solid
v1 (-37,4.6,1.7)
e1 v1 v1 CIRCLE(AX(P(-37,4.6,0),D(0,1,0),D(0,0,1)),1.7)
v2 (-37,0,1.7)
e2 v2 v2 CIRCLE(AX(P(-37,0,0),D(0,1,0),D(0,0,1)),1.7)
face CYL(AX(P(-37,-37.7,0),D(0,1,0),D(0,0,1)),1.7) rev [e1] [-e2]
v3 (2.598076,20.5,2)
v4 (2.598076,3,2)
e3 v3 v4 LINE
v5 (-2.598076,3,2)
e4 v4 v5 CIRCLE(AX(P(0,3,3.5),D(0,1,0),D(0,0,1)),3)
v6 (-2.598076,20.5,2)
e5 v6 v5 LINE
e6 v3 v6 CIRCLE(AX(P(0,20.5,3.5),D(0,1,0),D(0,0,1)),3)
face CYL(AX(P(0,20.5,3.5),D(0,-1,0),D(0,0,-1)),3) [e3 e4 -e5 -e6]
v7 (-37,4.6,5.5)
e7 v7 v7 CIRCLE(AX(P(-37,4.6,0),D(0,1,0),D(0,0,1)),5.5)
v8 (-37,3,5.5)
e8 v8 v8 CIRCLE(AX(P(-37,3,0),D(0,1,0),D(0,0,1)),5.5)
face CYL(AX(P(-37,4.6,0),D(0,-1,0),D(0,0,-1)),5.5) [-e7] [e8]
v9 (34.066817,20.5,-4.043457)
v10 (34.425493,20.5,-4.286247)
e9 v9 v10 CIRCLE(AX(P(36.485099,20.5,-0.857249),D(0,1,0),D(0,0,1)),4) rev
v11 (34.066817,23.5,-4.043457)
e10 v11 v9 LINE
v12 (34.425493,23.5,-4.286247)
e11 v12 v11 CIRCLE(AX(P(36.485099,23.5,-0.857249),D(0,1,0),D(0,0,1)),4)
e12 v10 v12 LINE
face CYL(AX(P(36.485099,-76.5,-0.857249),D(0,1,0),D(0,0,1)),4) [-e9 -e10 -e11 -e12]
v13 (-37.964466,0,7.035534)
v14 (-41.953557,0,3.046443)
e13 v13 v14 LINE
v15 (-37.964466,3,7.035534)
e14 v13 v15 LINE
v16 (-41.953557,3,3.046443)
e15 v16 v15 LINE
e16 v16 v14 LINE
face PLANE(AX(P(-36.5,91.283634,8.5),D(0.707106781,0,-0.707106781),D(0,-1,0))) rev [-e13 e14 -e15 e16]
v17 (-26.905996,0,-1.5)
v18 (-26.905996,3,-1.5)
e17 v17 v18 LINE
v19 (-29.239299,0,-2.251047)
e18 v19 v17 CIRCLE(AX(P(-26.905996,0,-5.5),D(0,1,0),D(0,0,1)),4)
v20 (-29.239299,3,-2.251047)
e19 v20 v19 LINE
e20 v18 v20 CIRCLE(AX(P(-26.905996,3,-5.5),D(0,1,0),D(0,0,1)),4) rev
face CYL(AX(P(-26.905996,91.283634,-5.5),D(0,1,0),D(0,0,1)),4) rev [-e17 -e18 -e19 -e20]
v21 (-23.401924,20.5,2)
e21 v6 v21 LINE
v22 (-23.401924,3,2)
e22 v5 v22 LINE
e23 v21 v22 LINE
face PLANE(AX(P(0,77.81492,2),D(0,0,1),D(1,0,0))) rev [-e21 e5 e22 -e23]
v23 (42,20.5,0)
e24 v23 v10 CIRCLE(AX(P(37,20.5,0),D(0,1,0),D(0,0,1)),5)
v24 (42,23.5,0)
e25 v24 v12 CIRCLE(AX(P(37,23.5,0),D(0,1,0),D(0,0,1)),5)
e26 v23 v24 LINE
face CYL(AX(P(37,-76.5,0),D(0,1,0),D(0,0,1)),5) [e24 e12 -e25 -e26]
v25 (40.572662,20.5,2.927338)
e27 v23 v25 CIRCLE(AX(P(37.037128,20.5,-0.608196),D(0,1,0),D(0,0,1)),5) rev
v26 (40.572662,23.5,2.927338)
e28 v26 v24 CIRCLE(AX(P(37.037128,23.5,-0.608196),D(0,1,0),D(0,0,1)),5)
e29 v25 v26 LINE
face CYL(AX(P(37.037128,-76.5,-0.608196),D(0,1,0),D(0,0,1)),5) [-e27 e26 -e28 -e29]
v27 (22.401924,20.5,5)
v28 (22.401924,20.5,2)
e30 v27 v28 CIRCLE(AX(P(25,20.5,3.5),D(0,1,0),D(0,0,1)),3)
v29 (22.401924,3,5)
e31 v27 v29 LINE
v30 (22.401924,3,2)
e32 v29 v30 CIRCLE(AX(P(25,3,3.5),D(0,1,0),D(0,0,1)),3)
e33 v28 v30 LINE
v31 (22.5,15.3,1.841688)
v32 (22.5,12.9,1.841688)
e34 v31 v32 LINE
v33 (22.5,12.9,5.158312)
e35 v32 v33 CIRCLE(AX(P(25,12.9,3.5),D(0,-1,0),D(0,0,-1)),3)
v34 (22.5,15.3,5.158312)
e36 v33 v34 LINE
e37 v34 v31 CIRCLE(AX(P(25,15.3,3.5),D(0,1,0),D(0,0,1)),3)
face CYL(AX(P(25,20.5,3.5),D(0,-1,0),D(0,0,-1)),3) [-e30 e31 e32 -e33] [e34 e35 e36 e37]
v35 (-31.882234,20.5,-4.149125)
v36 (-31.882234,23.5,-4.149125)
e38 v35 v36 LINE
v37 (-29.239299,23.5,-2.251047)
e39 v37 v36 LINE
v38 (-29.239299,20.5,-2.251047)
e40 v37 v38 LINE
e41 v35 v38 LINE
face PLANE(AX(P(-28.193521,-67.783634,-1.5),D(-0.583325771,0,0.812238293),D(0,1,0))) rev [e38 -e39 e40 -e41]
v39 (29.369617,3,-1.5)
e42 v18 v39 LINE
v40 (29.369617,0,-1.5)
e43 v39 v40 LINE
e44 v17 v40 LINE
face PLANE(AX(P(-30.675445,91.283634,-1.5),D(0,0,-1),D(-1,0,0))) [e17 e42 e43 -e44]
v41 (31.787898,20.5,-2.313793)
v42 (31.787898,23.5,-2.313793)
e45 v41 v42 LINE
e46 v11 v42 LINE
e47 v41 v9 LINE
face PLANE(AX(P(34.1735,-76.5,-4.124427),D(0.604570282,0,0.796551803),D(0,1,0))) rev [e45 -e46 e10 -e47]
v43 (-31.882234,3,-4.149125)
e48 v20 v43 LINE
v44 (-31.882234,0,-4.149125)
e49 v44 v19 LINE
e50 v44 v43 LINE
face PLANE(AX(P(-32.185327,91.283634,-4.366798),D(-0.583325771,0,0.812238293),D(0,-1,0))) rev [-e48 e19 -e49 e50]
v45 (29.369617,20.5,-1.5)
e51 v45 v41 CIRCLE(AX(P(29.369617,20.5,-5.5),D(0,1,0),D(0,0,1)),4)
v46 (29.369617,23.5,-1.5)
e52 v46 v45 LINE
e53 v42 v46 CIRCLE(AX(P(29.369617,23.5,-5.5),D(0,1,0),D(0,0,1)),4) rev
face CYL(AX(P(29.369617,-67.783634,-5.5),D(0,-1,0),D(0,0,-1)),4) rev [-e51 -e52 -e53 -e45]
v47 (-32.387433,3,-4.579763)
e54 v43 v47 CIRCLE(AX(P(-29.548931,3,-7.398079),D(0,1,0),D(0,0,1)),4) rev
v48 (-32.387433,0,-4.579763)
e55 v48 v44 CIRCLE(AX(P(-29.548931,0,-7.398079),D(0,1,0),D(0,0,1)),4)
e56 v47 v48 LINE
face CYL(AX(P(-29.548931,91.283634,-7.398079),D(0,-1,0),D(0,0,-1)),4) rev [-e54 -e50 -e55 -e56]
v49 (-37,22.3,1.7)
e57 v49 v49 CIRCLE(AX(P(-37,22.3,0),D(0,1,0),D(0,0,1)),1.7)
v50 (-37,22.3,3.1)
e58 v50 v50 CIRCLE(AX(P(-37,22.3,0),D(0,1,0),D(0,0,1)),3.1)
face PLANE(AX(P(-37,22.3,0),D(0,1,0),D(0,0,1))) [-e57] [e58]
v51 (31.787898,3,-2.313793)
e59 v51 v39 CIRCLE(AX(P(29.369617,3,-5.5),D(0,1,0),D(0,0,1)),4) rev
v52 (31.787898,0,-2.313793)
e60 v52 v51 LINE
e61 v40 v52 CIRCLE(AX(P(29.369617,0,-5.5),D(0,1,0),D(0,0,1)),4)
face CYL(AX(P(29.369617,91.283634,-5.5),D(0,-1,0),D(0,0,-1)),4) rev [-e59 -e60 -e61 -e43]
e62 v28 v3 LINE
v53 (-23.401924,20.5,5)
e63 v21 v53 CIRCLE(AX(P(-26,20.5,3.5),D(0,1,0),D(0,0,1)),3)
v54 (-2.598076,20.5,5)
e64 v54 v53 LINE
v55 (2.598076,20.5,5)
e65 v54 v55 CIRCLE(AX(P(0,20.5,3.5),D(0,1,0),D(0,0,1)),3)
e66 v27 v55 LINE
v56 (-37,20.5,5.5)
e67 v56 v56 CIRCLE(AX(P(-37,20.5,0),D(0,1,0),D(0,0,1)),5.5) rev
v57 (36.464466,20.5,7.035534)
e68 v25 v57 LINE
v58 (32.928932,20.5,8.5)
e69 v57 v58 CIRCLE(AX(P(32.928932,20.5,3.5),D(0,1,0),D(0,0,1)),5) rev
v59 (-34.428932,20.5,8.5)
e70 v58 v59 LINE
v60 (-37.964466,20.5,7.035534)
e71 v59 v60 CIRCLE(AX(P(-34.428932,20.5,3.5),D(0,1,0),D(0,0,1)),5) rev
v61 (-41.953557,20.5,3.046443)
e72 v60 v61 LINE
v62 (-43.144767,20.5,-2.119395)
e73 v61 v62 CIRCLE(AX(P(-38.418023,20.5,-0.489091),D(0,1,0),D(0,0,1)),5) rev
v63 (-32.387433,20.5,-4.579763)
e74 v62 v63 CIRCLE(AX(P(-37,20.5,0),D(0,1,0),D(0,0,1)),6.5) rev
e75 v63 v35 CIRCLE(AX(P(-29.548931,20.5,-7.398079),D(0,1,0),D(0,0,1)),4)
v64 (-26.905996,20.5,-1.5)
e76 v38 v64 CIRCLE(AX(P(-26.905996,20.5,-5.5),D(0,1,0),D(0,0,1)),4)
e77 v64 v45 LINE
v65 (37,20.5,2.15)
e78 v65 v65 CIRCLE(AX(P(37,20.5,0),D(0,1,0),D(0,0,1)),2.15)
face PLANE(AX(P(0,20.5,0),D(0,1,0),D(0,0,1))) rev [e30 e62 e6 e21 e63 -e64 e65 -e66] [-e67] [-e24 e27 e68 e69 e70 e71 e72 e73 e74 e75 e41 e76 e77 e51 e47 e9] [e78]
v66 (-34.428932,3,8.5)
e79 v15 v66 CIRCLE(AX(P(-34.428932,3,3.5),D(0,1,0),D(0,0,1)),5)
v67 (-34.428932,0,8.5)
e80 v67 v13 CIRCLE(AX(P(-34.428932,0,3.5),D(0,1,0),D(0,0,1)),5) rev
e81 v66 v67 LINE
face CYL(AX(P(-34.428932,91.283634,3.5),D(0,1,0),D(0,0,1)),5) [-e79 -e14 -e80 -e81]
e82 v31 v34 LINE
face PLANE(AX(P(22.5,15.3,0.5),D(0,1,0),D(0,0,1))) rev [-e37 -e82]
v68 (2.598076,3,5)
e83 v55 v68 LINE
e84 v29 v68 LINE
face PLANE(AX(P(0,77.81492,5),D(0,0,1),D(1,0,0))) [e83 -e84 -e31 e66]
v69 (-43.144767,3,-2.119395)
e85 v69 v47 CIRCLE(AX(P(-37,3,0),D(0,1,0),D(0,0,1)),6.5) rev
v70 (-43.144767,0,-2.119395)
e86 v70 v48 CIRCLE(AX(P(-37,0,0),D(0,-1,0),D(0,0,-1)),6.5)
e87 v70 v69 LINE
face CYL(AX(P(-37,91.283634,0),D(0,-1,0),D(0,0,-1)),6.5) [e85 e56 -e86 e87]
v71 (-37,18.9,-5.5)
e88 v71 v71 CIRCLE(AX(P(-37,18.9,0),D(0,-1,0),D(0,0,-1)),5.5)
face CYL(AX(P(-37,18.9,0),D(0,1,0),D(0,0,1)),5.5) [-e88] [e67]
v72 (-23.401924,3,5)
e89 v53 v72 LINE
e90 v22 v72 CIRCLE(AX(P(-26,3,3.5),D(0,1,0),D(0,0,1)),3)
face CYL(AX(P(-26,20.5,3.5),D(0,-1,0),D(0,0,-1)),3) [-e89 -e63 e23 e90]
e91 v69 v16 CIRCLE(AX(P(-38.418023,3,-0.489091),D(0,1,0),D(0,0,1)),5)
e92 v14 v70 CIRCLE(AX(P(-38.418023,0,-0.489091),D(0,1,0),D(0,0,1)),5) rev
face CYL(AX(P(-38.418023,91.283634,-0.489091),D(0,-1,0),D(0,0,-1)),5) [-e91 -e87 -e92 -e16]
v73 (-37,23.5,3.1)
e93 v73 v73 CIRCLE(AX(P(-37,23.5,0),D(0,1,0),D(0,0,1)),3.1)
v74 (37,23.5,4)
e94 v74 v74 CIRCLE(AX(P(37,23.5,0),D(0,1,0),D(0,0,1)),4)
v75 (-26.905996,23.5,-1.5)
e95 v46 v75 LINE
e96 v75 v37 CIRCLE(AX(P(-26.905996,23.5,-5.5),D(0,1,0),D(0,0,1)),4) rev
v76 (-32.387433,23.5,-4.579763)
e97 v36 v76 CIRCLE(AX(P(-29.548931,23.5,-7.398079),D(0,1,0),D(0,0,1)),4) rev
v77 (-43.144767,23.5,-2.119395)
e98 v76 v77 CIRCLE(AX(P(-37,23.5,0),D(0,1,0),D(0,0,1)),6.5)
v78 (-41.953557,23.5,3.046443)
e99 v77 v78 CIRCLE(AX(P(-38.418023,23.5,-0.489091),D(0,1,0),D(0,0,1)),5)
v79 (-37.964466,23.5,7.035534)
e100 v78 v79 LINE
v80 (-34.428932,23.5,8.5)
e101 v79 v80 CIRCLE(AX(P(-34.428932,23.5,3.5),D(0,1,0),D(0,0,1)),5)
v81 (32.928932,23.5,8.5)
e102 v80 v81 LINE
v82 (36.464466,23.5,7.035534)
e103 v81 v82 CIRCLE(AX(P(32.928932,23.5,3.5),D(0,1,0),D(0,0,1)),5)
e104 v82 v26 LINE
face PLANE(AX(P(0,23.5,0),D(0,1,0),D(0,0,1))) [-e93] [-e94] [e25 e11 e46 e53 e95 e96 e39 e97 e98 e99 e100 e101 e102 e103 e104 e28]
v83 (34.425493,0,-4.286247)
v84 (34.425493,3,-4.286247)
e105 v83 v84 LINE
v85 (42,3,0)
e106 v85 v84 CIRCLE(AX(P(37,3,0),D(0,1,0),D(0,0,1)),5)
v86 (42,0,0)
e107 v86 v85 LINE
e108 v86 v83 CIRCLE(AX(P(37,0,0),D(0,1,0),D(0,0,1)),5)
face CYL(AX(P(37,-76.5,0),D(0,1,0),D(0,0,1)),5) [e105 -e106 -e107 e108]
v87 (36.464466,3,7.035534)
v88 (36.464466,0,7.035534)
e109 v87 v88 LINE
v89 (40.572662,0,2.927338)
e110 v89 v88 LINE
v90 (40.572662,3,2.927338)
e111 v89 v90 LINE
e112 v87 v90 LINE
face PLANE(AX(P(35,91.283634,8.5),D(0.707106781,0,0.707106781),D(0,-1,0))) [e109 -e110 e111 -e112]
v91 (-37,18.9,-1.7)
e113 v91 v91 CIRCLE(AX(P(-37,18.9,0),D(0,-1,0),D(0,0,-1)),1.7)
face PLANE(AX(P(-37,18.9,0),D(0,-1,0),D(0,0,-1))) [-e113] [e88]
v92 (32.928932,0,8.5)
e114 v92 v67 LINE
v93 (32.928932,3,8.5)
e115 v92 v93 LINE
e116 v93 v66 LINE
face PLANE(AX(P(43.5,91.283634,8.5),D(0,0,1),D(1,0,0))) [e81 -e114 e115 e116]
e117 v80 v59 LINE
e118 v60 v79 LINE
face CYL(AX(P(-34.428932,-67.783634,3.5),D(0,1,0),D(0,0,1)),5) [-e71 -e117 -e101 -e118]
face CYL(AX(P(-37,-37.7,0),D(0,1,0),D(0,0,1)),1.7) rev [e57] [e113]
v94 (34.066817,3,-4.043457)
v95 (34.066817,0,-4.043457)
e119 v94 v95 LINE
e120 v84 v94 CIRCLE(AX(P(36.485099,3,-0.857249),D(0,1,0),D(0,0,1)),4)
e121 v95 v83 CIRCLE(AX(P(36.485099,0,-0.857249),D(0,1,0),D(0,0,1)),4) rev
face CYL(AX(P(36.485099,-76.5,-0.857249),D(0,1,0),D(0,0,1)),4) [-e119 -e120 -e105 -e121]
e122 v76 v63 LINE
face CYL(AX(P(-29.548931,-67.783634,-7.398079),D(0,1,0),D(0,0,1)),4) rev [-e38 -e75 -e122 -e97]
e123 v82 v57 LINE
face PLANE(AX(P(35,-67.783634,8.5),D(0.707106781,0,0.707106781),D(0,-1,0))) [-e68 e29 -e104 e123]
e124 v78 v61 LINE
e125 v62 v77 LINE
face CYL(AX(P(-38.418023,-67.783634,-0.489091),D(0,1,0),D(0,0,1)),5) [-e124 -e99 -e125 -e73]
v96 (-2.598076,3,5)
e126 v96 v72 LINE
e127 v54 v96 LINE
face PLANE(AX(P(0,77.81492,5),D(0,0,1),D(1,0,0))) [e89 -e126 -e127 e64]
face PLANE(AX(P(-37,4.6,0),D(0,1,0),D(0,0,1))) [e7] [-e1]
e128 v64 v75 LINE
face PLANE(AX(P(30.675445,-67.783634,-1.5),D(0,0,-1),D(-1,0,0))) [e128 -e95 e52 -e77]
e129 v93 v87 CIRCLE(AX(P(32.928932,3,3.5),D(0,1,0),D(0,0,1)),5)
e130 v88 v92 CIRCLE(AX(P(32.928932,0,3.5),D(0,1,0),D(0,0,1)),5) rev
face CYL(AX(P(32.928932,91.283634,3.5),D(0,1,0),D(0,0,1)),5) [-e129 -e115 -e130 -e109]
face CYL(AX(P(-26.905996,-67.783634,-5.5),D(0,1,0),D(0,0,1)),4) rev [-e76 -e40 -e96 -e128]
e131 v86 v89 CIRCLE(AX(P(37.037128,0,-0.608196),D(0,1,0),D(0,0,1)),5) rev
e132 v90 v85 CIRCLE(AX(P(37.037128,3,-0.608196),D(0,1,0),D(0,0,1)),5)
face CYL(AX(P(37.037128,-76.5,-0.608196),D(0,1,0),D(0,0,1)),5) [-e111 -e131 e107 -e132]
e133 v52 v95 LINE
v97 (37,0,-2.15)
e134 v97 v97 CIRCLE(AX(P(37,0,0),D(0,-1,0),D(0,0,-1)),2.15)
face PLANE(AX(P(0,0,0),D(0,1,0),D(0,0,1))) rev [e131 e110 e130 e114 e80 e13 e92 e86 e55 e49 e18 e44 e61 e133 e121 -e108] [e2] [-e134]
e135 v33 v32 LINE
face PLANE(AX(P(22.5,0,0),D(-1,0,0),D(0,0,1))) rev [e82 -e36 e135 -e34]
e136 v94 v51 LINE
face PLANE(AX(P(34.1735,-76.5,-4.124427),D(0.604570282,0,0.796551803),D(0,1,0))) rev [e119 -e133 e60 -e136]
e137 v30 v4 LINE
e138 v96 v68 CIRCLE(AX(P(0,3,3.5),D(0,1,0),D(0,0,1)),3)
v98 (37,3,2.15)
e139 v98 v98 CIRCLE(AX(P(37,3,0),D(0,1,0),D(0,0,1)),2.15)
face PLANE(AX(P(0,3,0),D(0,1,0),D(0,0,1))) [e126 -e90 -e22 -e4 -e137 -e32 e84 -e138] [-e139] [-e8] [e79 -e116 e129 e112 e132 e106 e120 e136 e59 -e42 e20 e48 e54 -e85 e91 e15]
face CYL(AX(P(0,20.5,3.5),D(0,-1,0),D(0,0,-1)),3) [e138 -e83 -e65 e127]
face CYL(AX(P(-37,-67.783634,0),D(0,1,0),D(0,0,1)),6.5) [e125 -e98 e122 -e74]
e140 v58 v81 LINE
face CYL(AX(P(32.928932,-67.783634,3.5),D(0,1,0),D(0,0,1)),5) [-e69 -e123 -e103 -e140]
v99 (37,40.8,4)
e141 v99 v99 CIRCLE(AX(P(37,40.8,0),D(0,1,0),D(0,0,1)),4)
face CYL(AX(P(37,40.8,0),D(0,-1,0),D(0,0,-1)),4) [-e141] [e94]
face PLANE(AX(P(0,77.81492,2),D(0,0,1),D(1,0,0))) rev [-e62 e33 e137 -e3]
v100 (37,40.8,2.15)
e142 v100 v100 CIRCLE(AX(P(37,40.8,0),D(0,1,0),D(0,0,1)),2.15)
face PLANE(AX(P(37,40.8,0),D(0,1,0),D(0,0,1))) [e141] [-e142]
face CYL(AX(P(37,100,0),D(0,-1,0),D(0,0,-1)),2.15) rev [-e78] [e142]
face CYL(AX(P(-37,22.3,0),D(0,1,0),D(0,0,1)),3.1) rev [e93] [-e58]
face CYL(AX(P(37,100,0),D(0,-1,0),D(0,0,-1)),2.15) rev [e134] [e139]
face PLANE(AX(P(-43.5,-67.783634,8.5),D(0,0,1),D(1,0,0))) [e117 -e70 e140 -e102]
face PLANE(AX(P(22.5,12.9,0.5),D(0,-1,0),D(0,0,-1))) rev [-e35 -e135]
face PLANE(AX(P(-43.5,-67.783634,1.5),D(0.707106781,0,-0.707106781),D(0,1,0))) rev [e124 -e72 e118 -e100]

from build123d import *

# Parameters (mm, degrees)
SKETCH_1_R          = 4.5
SKETCH_1_R_2        = 1.6
EXTRUDE_3_DEPTH     = 3
SKETCH_2_R          = 3
EXTRUDE_4_DEPTH     = 17.5
SKETCH_3_R          = 3
SKETCH_3_R_2        = 1.6
EXTRUDE_5_DEPTH     = 3
SKETCH_4_R          = 1.6
SKETCH_4_R_2        = 2.15
CUT_EXTRUDE_1_DEPTH = 100
SKETCH_6_R          = 4
SKETCH_6_R_2        = 2.15
EXTRUDE_6_DEPTH     = 17.3
SKETCH_7_R          = 2.15
SKETCH_7_R_2        = 1.6
EXTRUDE_7_DEPTH     = 3
EXTRUDE_START       = -3
SKETCH_8_R          = 1.6
EXTRUDE_8_DEPTH     = 3
EXTRUDE_10_DEPTH    = 17.5
CUT_EXTRUDE_START   = -100
CUT_EXTRUDE_2_DEPTH = 100
SKETCH_13_R         = 2.15
CUT_EXTRUDE_3_DEPTH = 23.5
CHAMFER_1_SIZE      = 7
FILLET_1_R          = 5
SKETCH_14_W         = 6
SKETCH_14_H         = 2.4
CUT_EXTRUDE_4_DEPTH = 7.5
SKETCH_16_R         = 5.5
EXTRUDE_11_DEPTH    = 1.6
EXTRUDE_START_2     = 1.6
SKETCH_17_R         = 5.5
EXTRUDE_12_DEPTH    = 1.6
CUT_EXTRUDE_START_2 = -50
SKETCH_18_R         = 1.6
CUT_EXTRUDE_5_DEPTH = 50
SKETCH_20_R         = 3.1
CUT_EXTRUDE_7_DEPTH = 1.2
SKETCH_21_R         = 1.7
CUT_EXTRUDE_8_DEPTH = 60
CHAMFER_START       = -1
CHAMFER_2_DEPTH     = 25
CHAMFER_2_2_DEPTH   = 3
CHAMFER_START_2     = 20.5
CHAMFER_2_3_DEPTH   = 3
FILLET_2_R          = 4


with BuildPart() as part:
    # 草图1 → 凸台-拉伸3 (new body)
    # profile 1 of 3: a face of its own
    with BuildSketch(Plane(origin=(0, 0, 0), x_dir=(1, 0, 0), z_dir=(0, 1, 0))):
        with BuildLine():
            Line((-41.5, -6.5), (41.5, -6.5))
            Line((41.5, -6.5), (41.5, 0))
            ThreePointArc((41.5, 0), (37.250387902, -4.493028589), (32.527864045, -0.5))
            Line((32.527864045, -0.5), (-32.527864045, -0.5))
            ThreePointArc((-32.527864045, -0.5), (-37.250387902, -4.493028589), (-41.5, 0))
            Line((-41.5, 0), (-41.5, -6.5))
        make_face()
    # profile 2 of 3: a face of its own
    with BuildSketch(Plane(origin=(0, 0, 0), x_dir=(1, 0, 0), z_dir=(0, 1, 0))):
        with Locations((-37, 0)):
            Circle(SKETCH_1_R)
        with Locations(Location((-37, 0, 0), (0, 0, 270))):
            Circle(SKETCH_1_R_2, mode=Mode.SUBTRACT)
    # profile 3 of 3: a face of its own
    with BuildSketch(Plane(origin=(0, 0, 0), x_dir=(1, 0, 0), z_dir=(0, 1, 0))):
        with Locations((37, 0)):
            Circle(SKETCH_1_R)
        with Locations(Location((37, 0, 0), (0, 0, 270))):
            Circle(SKETCH_1_R_2, mode=Mode.SUBTRACT)
    extrude(amount=EXTRUDE_3_DEPTH)

    # 草图2 → 凸台-拉伸4 (add)
    with BuildSketch(Plane(origin=(0, 3, 0), x_dir=(1, 0, 0), z_dir=(0, 1, 0))):
        with Locations(Location((-26, -3.5, 0), (0, 0, 270))):
            Circle(SKETCH_2_R)
        with Locations(Location((25, -3.5, 0), (0, 0, 270))):
            Circle(SKETCH_2_R)
        with Locations(Location((0, -3.5, 0), (0, 0, 270))):
            Circle(SKETCH_2_R)
    extrude(amount=EXTRUDE_4_DEPTH)

    # 草图3 → 凸台-拉伸5 (add)
    # profile 1 of 7: a face of its own
    with BuildSketch(Plane(origin=(0, 20.5, 0), x_dir=(1, 0, 0), z_dir=(0, 1, 0))):
        with Locations(Location((-26, -3.5, 0), (0, 0, 90))):
            Circle(SKETCH_3_R)
    # profile 2 of 7: a face of its own
    with BuildSketch(Plane(origin=(0, 20.5, 0), x_dir=(1, 0, 0), z_dir=(0, 1, 0))):
        with BuildLine():
            ThreePointArc((0, -6.5), (-3, -3.5), (0, -0.5))
            Line((0, -0.5), (-26, -0.5))
            ThreePointArc((-26, -0.5), (-23.878679656, -1.378679656), (-23, -3.5))
            ThreePointArc((-23, -3.5), (-23.878679656, -5.621320344), (-26, -6.5))
            Line((-26, -6.5), (0, -6.5))
        make_face()
    # profile 3 of 7: a face of its own
    with BuildSketch(Plane(origin=(0, 20.5, 0), x_dir=(1, 0, 0), z_dir=(0, 1, 0))):
        with BuildLine():
            ThreePointArc((3, -3.5), (2.121320344, -1.378679656), (0, -0.5))
            ThreePointArc((0, -0.5), (-3, -3.5), (0, -6.5))
            ThreePointArc((0, -6.5), (2.121320344, -5.621320344), (3, -3.5))
        make_face()
    # profile 4 of 7: a face of its own
    with BuildSketch(Plane(origin=(0, 20.5, 0), x_dir=(1, 0, 0), z_dir=(0, 1, 0))):
        with BuildLine():
            ThreePointArc((25, -6.5), (22, -3.5), (25, -0.5))
            Line((25, -0.5), (0, -0.5))
            ThreePointArc((0, -0.5), (2.121320344, -1.378679656), (3, -3.5))
            ThreePointArc((3, -3.5), (2.121320344, -5.621320344), (0, -6.5))
            Line((0, -6.5), (25, -6.5))
        make_face()
    # profile 5 of 7: a face of its own
    with BuildSketch(Plane(origin=(0, 20.5, 0), x_dir=(1, 0, 0), z_dir=(0, 1, 0))):
        with BuildLine():
            ThreePointArc((28, -3.5), (27.121320344, -1.378679656), (25, -0.5))
            ThreePointArc((25, -0.5), (22, -3.5), (25, -6.5))
            ThreePointArc((25, -6.5), (27.121320344, -5.621320344), (28, -3.5))
        make_face()
    # profile 6 of 7: a face of its own
    with BuildSketch(Plane(origin=(0, 20.5, 0), x_dir=(1, 0, 0), z_dir=(0, 1, 0))):
        with BuildLine():
            Line((41.5, -6.5), (41.5, 0))
            ThreePointArc((41.5, 0), (36.749612098, 4.493028589), (32.527864045, -0.5))
            Line((32.527864045, -0.5), (25, -0.5))
            ThreePointArc((25, -0.5), (28, -3.5), (25, -6.5))
            Line((25, -6.5), (41.5, -6.5))
        make_face()
        with Locations(Location((37, 0, 0), (0, 0, 270))):
            Circle(SKETCH_3_R_2, mode=Mode.SUBTRACT)
    # profile 7 of 7: a face of its own
    with BuildSketch(Plane(origin=(0, 20.5, 0), x_dir=(1, 0, 0), z_dir=(0, 1, 0))):
        with BuildLine():
            ThreePointArc((-26, -0.5), (-29, -3.5), (-26, -6.5))
            Line((-26, -6.5), (-41.5, -6.5))
            Line((-41.5, -6.5), (-41.5, 0))
            ThreePointArc((-41.5, 0), (-36.749612098, 4.493028589), (-32.527864045, -0.5))
            Line((-32.527864045, -0.5), (-26, -0.5))
        make_face()
    extrude(amount=EXTRUDE_5_DEPTH)

    # 草图4 → 切除-拉伸1 (cut)
    with BuildSketch(Plane.XZ):
        with Locations(Location((-37, 0, 0), (0, 0, 90))):
            Circle(SKETCH_4_R)
        with Locations(Location((37, 0, 0), (0, 0, 90))):
            Circle(SKETCH_4_R_2)
    extrude(amount=-CUT_EXTRUDE_1_DEPTH, mode=Mode.SUBTRACT)

    # 草图6 → 凸台-拉伸6 (add)
    with BuildSketch(Plane(origin=(0, 23.5, 0), x_dir=(1, 0, 0), z_dir=(0, 1, 0))):
        with Locations(Location((37, 0, 0), (0, 0, 270))):
            Circle(SKETCH_6_R)
        with Locations(Location((37, 0, 0), (0, 0, 270))):
            Circle(SKETCH_6_R_2, mode=Mode.SUBTRACT)
    extrude(amount=EXTRUDE_6_DEPTH)

    # 草图7 → 凸台-拉伸7 (add)
    with BuildSketch(Plane.XZ):
        with BuildLine():
            Line((43.5, 0), (43.5, 8.5))
            Line((43.5, 8.5), (-43.5, 8.5))
            Line((-43.5, 8.5), (-43.5, 0))
            ThreePointArc((-43.5, 0), (-37.755112713, -6.455989838), (-30.67544468, -1.5))
            Line((-30.67544468, -1.5), (30.67544468, -1.5))
            ThreePointArc((30.67544468, -1.5), (37.755112713, -6.455989838), (43.5, 0))
        make_face()
        with Locations(Location((37, 0, 0), (0, 0, 90))):
            Circle(SKETCH_7_R, mode=Mode.SUBTRACT)
        with Locations(Location((-37, 0, 0), (0, 0, 90))):
            Circle(SKETCH_7_R_2, mode=Mode.SUBTRACT)
    extrude(amount=-EXTRUDE_7_DEPTH)

    # 草图8 → 凸台-拉伸8 (add)
    with BuildSketch(Plane(origin=(0, 23.5, 0), x_dir=(1, 0, 0), z_dir=(0, 1, 0)).offset(EXTRUDE_START)):
        with BuildLine():
            Line((30.67544468, 1.5), (-30.67544468, 1.5))
            ThreePointArc((-30.67544468, 1.5), (-37.755112713, 6.455989838), (-43.5, 0))
            Line((-43.5, 0), (-43.5, -8.5))
            Line((-43.5, -8.5), (43.5, -8.5))
            Line((43.5, -8.5), (43.5, 0))
            ThreePointArc((43.5, 0), (37.755112713, 6.455989838), (30.67544468, 1.5))
        make_face()
        with Locations(Location((-37, 0, 0), (0, 0, 270))):
            Circle(SKETCH_8_R, mode=Mode.SUBTRACT)
        with Locations(Location((37, 0, 0), (0, 0, 270))):
            Circle(SKETCH_8_R, mode=Mode.SUBTRACT)
    extrude(amount=EXTRUDE_8_DEPTH)

    # 草图10 → 凸台-拉伸10 (add)
    with BuildSketch(Plane(origin=(0, 3, 0), x_dir=(1, 0, 0), z_dir=(0, 1, 0))):
        with BuildLine():
            ThreePointArc((22.401923789, -5), (22, -3.5), (22.401923789, -2))
            Line((22.401923789, -2), (2.598076211, -2))
            ThreePointArc((2.598076211, -2), (3, -3.5), (2.598076211, -5))
            Line((2.598076211, -5), (22.401923789, -5))
        make_face()
        with BuildLine():
            ThreePointArc((-2.598076211, -5), (-3, -3.5), (-2.598076211, -2))
            Line((-2.598076211, -2), (-23.401923789, -2))
            ThreePointArc((-23.401923789, -2), (-23, -3.5), (-23.401923789, -5))
            Line((-23.401923789, -5), (-2.598076211, -5))
        make_face()
    extrude(amount=EXTRUDE_10_DEPTH)

    # 草图11 → 切除-拉伸2 (cut)
    with BuildSketch(Plane(origin=(0, 23.5, 0), x_dir=(1, 0, 0), z_dir=(0, 1, 0)).offset(CUT_EXTRUDE_START)):
        with BuildLine():
            ThreePointArc((43.5, 0), (37.755112713, 6.455989838), (30.67544468, 1.5))
            Line((30.67544468, 1.5), (32.230303993, 1.5))
            ThreePointArc((32.230303993, 1.5), (37.758788496, 4.942088629), (42, 0))
            Line((42, 0), (42, -4.153311931))
            ThreePointArc((42, -4.153311931), (43.11350963, -2.207940217), (43.5, 0))
        make_face()
        with BuildLine():
            Line((43.5, -8.5), (43.5, 0))
            ThreePointArc((43.5, 0), (43.11350963, -2.207940217), (42, -4.153311931))
            Line((42, -4.153311931), (42, -8.5))
            Line((42, -8.5), (43.5, -8.5))
        make_face()
    extrude(amount=CUT_EXTRUDE_2_DEPTH, mode=Mode.SUBTRACT)

    # 草图13 → 切除-拉伸3 (cut)
    with BuildSketch(Plane.XZ):
        with Locations(Location((37, 0, 0), (0, 0, 90))):
            Circle(SKETCH_13_R)
    extrude(amount=-CUT_EXTRUDE_3_DEPTH, mode=Mode.SUBTRACT)

    # 倒角1
    chamfer_1_edges = [part.edges().sort_by_distance(p)[0] for p in [
        (-43.5, 1.5, 8.5),
        (-43.5, 22, 8.5),
        (42, 1.5, 8.5),
        (42, 22, 8.5),
    ]]
    chamfer(chamfer_1_edges, length=CHAMFER_1_SIZE)

    # 圆角1
    # the kernel refuses this fillet: 5 mm, written as the material it takes off along each edge
    with BuildSketch(Plane(origin=(42, -5.046401969, 1.5), x_dir=(-0.7071067811865467, 0, 0.7071067811865482), z_dir=(0, 1, 0))) as fillet_1_piece_1:
        with BuildLine():
            CenterArc((2.018560788, -5), FILLET_1_R, 90, 38.013286415)
            Line((-1.060660172, -1.060660172), (-1.122244591, -0.981873375))
            ThreePointArc((-1.122244591, -0.981873375), (-0.601040764, -0.459619408), (-0.070710678, 0.070710678))
            Line((-0.070710678, 0.070710678), (0, 0.1))
            Line((0, 0.1), (2.018560788, 0.1))
            Line((2.018560788, 0.1), (2.018560788, 0))
        make_face()
    extrude(amount=13.092803939, mode=Mode.SUBTRACT)
    with BuildSketch(Plane(origin=(42, 15.453598031, 1.5), x_dir=(0, 0, -1), z_dir=(0, 1, 0))) as fillet_1_piece_2:
        with BuildLine():
            CenterArc((2.108195885, 4.962871927), FILLET_1_R, 225, 38.013286415)
            Line((-1.427338021, 1.427338021), (-1.498048699, 1.356627343))
            Line((-1.498048699, 1.356627343), (-0.070710678, -0.070710678))
            Line((-0.070710678, -0.070710678), (0, -0.1))
            ThreePointArc((0, -0.1), (0.75, -0.1), (1.487836082, -0.099257439))
            Line((1.487836082, -0.099257439), (1.5, 0))
        make_face()
    extrude(amount=13.092803939, mode=Mode.SUBTRACT)
    with BuildSketch(Plane(origin=(35, -5.17766953, 8.5), x_dir=(-1, 0, 0), z_dir=(0, 1, 0)), Plane(origin=(-36.5, -5.17766953, 8.5), x_dir=(-0.707106781186547, 0, -0.7071067811865479), z_dir=(0, 1, 0))) as fillet_1_piece_3:
        with BuildLine():
            CenterArc((FILLET_1_R * 0.414213562373, -FILLET_1_R), FILLET_1_R, 90, 45)
            Line((-FILLET_1_R * 0.292893218813, -FILLET_1_R * 0.292893218813), (-FILLET_1_R * 0.307035354437, -FILLET_1_R * 0.27875108319))
            Line((-FILLET_1_R * 0.307035354437, -FILLET_1_R * 0.27875108319), (-FILLET_1_R * 0.00828427124746, FILLET_1_R * 0.02))
            Line((-FILLET_1_R * 0.00828427124746, FILLET_1_R * 0.02), (FILLET_1_R * 0.414213562373, FILLET_1_R * 0.02))
            Line((FILLET_1_R * 0.414213562373, FILLET_1_R * 0.02), (FILLET_1_R * 0.414213562373, 0))
        make_face()
    extrude(amount=13.355339059, mode=Mode.SUBTRACT)
    with BuildSketch(Plane(origin=(35, 15.32233047, 8.5), x_dir=(0.7071067811865476, 0, -0.7071067811865476), z_dir=(0, 1, 0)), Plane(origin=(-36.5, 15.32233047, 8.5), x_dir=(1, 0, 0), z_dir=(0, 1, 0))) as fillet_1_piece_4:
        with BuildLine():
            CenterArc((FILLET_1_R * 0.414213562373, FILLET_1_R), FILLET_1_R, 225, 45)
            Line((-FILLET_1_R * 0.292893218813, FILLET_1_R * 0.292893218813), (-FILLET_1_R * 0.307035354437, FILLET_1_R * 0.27875108319))
            Line((-FILLET_1_R * 0.307035354437, FILLET_1_R * 0.27875108319), (-FILLET_1_R * 0.00828427124746, -FILLET_1_R * 0.02))
            Line((-FILLET_1_R * 0.00828427124746, -FILLET_1_R * 0.02), (FILLET_1_R * 0.414213562373, -FILLET_1_R * 0.02))
            Line((FILLET_1_R * 0.414213562373, -FILLET_1_R * 0.02), (FILLET_1_R * 0.414213562373, 0))
        make_face()
    extrude(amount=13.355339059, mode=Mode.SUBTRACT)
    with BuildSketch(Plane(origin=(-43.5, -9.091963291, 1.5), x_dir=(0.09767763487953848, 0, -0.9952181065697808), z_dir=(0, 1, 0))) as fillet_1_piece_5:
        with BuildLine():
            CenterArc((2.475974909, -4.86338557), FILLET_1_R, 76.575603984, 64.029849994)
            Line((-1.387995041, -1.6901008), (-1.774392036, -1.372772323))
            Line((-1.774392036, -1.372772323), (-0.386396995, 0.317328477))
            Line((-0.386396995, 0.317328477), (-0.048838817, 0.497609053))
            ThreePointArc((-0.048838817, 0.497609053), (1.443988342, 0.644125506), (3.752866357, 0.486338557))
            Line((3.752866357, 0.486338557), (3.636785316, 0))
        make_face()
    extrude(amount=21.183926582, mode=Mode.SUBTRACT)
    with BuildSketch(Plane(origin=(-43.5, 11.408036709, 1.5), x_dir=(0.7071067811865467, 0, 0.7071067811865483), z_dir=(0, 1, 0))) as fillet_1_piece_6:
        with BuildLine():
            CenterArc((2.187000445, 5), FILLET_1_R, 205.970150006, 64.029849994)
            Line((-2.308111091, 2.810485835), (-2.757622245, 2.591534419))
            ThreePointArc((-2.757622245, 2.591534419), (-1.414213562, 0.707106781), (-0.353553391, -0.353553391))
            Line((-0.353553391, -0.353553391), (0, -0.5))
            Line((0, -0.5), (2.187000445, -0.5))
            Line((2.187000445, -0.5), (2.187000445, 0))
        make_face()
    extrude(amount=21.183926582, mode=Mode.SUBTRACT)

    # 草图14 → 切除-拉伸4 (cut)
    with BuildSketch(Plane(origin=(30, 0, 0), x_dir=(0, 0, -1), z_dir=(1, 0, 0))):
        with Locations((-3.5, 14.1)):
            Rectangle(SKETCH_14_W, SKETCH_14_H)
    extrude(amount=-CUT_EXTRUDE_4_DEPTH, mode=Mode.SUBTRACT)

    # 草图16 → 凸台-拉伸11 (add)
    with BuildSketch(Plane.XZ.offset(-20.5)):
        with Locations(Location((-37, 0, 0), (0, 0, 90))):
            Circle(SKETCH_16_R)
    extrude(amount=EXTRUDE_11_DEPTH)

    # 草图17 → 凸台-拉伸12 (add)
    with BuildSketch(Plane(origin=(0, 3, 0), x_dir=(1, 0, 0), z_dir=(0, 1, 0)).offset(EXTRUDE_START_2)):
        with Locations(Location((-37, 0, 0), (0, 0, 270))):
            Circle(SKETCH_17_R)
    extrude(amount=-EXTRUDE_12_DEPTH)

    # 草图18 → 切除-拉伸5 (cut)
    with BuildSketch(Plane(origin=(0, 20.5, 0), x_dir=(1, 0, 0), z_dir=(0, 1, 0)).offset(CUT_EXTRUDE_START_2)):
        with Locations(Location((-37, 0, 0), (0, 0, 270))):
            Circle(SKETCH_18_R)
    extrude(amount=CUT_EXTRUDE_5_DEPTH, mode=Mode.SUBTRACT)

    # 草图20 → 切除-拉伸7 (cut)
    with BuildSketch(Plane(origin=(0, 23.5, 0), x_dir=(1, 0, 0), z_dir=(0, 1, 0))):
        with Locations(Location((-37, 0, 0), (0, 0, 270))):
            Circle(SKETCH_20_R)
    extrude(amount=-CUT_EXTRUDE_7_DEPTH, mode=Mode.SUBTRACT)

    # 草图21 → 切除-拉伸8 (cut)
    with BuildSketch(Plane(origin=(0, 22.3, 0), x_dir=(1, 0, 0), z_dir=(0, 1, 0))):
        with Locations(Location((-37, 0, 0), (0, 0, 270))):
            Circle(SKETCH_21_R)
    extrude(amount=-CUT_EXTRUDE_8_DEPTH, mode=Mode.SUBTRACT)

    # 倒角2: read off the stored shape, not the designer's step
    # 倒角2 outline → 倒角2 (cut)
    with BuildSketch(Plane(origin=(0, 0, 0), x_dir=(1, 0, 0), z_dir=(0, 1, 0)).offset(CHAMFER_START)):
        with BuildLine():
            ThreePointArc((34.173499565, 4.124426662), (33.977148592, 3.982759014), (33.787886016, 3.831752047))
            Line((33.787886016, 3.831752047), (34.173499565, 4.124426662))
        make_face()
    extrude(amount=CHAMFER_2_DEPTH, mode=Mode.SUBTRACT)

    # Chamfer 2 2 outline → Chamfer 2 2 (add)
    with BuildSketch(Plane(origin=(0, 0, 0), x_dir=(1, 0, 0), z_dir=(0, 1, 0))):
        with BuildLine():
            Line((-30.67544468, 1.5), (-28.19352122, 1.5))
            Line((-28.19352122, 1.5), (-32.185327475, 4.366798424))
            ThreePointArc((-32.185327475, 4.366798424), (-31.248892929, 3.028987859), (-30.67544468, 1.5))
        make_face()
        with BuildLine():
            Line((33.787886016, 3.831752047), (30.715685226, 1.5))
            Line((30.715685226, 1.5), (32.230303993, 1.5))
            ThreePointArc((32.230303993, 1.5), (32.842285533, 2.777302723), (33.787886016, 3.831752047))
        make_face()
    extrude(amount=CHAMFER_2_2_DEPTH)

    # Chamfer 2 3 outline → Chamfer 2 3 (add)
    with BuildSketch(Plane(origin=(0, 0, 0), x_dir=(1, 0, 0), z_dir=(0, 1, 0)).offset(CHAMFER_START_2)):
        with BuildLine():
            Line((33.787886016, 3.831752047), (30.715685226, 1.5))
            Line((30.715685226, 1.5), (32.230303993, 1.5))
            ThreePointArc((32.230303993, 1.5), (32.842285533, 2.777302723), (33.787886016, 3.831752047))
        make_face()
    extrude(amount=CHAMFER_2_3_DEPTH)

    # 倒角3
    # the kernel refuses this chamfer: 5.389097704, 4 mm, written as the material it adds along each edge
    with BuildSketch(Plane(origin=(-30.67544468, 20.5, -1.5), x_dir=(-0.4659981321381575, 0, -0.8847857033450237), z_dir=(0, 1, 0))) as chamfer_3_piece_1:
        with BuildLine():
            Line((3.432952569, 0.096320014), (-1.349419443, -2.292290407))
            Line((-1.349419443, -2.292290407), (-1.444783375, -2.242064218))
            ThreePointArc((-1.444783375, -2.242064218), (-0.714445414, -1.125217245), (-0.095363932, 0.050226189))
            Line((-0.095363932, 0.050226189), (0.026863448, 0.104380577))
            ThreePointArc((0.026863448, 0.104380577), (1.718710533, -0.096583325), (3.40608912, 0.20070059))
            Line((3.40608912, 0.20070059), (3.432952569, 0.096320014))
        make_face()
    extrude(amount=3)

    # 圆角2
    # the kernel refuses this fillet: 4 mm, written as the material it adds along each edge
    with BuildSketch(Plane(origin=(30.715685226, 20.5, -1.5), x_dir=(-1, 0, 0), z_dir=(0, 1, 0))) as fillet_2_piece_1:
        with BuildLine():
            CenterArc((FILLET_2_R * 0.336517032608, -FILLET_2_R), FILLET_2_R, 90, 37.197926003)
            Line((-FILLET_2_R * 0.268053249006, -FILLET_2_R * 0.203448197172), (0, 0))
            Line((0, 0), (FILLET_2_R * 0.336517032608, 0))
        make_face()
    extrude(amount=3)
    with BuildSketch(Plane(origin=(-28.19352122, 0, -1.5), x_dir=(1, 0, 0), z_dir=(0, 1, 0))) as fillet_2_piece_2:
        with BuildLine():
            CenterArc((FILLET_2_R * 0.32188138429, FILLET_2_R), FILLET_2_R, 234.315198771, 35.684801229)
            Line((-FILLET_2_R * 0.261444386278, FILLET_2_R * 0.187761706522), (0, 0))
            Line((0, 0), (FILLET_2_R * 0.32188138429, 0))
        make_face()
    extrude(amount=3)
    with BuildSketch(Plane(origin=(30.715685226, 0, -1.5), x_dir=(0.7965518028281459, 0, -0.6045702816143302), z_dir=(0, 1, 0))) as fillet_2_piece_3:
        with BuildLine():
            CenterArc((FILLET_2_R * 0.336517032608, FILLET_2_R), FILLET_2_R, 232.802073997, 37.197926003)
            Line((-FILLET_2_R * 0.268053249006, FILLET_2_R * 0.203448197172), (0, 0))
            Line((0, 0), (FILLET_2_R * 0.336517032608, 0))
        make_face()
    extrude(amount=3)
    with BuildSketch(Plane(origin=(-32.185327475, 0, -4.366798424), x_dir=(0.8122382934777724, 0, 0.5833257705676271), z_dir=(0, 1, 0))) as fillet_2_piece_4:
        with BuildLine():
            CenterArc((0.37315848, 4), FILLET_2_R, 260.480336743, 9.519663257)
            ThreePointArc((-0.288385832, 0.055084396), (-0.143881862, 0.029170674), (0, 0))
            Line((0, 0), (0.37315848, 0))
        make_face()
    extrude(amount=3)
    with BuildSketch(Plane(origin=(-28.19352122, 23.5, -1.5), x_dir=(1, 0, 0), z_dir=(0, -1, 0))) as fillet_2_piece_5:
        with BuildLine():
            CenterArc((FILLET_2_R * 0.3218813843, -FILLET_2_R), FILLET_2_R, 90, 35.68480123)
            Line((-FILLET_2_R * 0.261444386283, -FILLET_2_R * 0.187761706533), (0, 0))
            Line((0, 0), (FILLET_2_R * 0.3218813843, 0))
        make_face()
    extrude(amount=3)
    with BuildSketch(Plane(origin=(-32.185327475, 23.5, -4.366798424), x_dir=(-0.688372609239569, 0, -0.7253572573902514), z_dir=(0, -1, 0))) as fillet_2_piece_6:
        with BuildLine():
            CenterArc((0.383937836, 3.998979744), FILLET_2_R, 259.186225678, 9.519663257)
            Line((-0.366531997, 0.070011045), (0, 0))
            ThreePointArc((0, 0), (0.146799761, 0.001657917), (0.293599522, 0))
        make_face()
    extrude(amount=3)
    # the kernel refuses this fillet: 4 mm, written as the material it takes off along each edge
    with BuildSketch(Plane(origin=(34.173499565, 19.751308545, -4.124426662), x_dir=(-0.7965518024446779, 0, 0.6045702821195685), z_dir=(0, 1, 0)), Plane(origin=(34.173499565, -0.748691455, -4.124426662), x_dir=(-0.7965518024446777, 0, 0.6045702821195689), z_dir=(0, 1, 0))) as fillet_2_2_piece_1:
        with BuildLine():
            CenterArc((0.133929997, 4), FILLET_2_R, 263.792944423, 6.207055577)
            ThreePointArc((-0.298557114, 0.023449372), (-0.14945416, 0.009488913), (0, 0))
            Line((0, 0), (0.133929997, 0))
        make_face()
    extrude(amount=4.497382911, mode=Mode.SUBTRACT)


solid = part.part
